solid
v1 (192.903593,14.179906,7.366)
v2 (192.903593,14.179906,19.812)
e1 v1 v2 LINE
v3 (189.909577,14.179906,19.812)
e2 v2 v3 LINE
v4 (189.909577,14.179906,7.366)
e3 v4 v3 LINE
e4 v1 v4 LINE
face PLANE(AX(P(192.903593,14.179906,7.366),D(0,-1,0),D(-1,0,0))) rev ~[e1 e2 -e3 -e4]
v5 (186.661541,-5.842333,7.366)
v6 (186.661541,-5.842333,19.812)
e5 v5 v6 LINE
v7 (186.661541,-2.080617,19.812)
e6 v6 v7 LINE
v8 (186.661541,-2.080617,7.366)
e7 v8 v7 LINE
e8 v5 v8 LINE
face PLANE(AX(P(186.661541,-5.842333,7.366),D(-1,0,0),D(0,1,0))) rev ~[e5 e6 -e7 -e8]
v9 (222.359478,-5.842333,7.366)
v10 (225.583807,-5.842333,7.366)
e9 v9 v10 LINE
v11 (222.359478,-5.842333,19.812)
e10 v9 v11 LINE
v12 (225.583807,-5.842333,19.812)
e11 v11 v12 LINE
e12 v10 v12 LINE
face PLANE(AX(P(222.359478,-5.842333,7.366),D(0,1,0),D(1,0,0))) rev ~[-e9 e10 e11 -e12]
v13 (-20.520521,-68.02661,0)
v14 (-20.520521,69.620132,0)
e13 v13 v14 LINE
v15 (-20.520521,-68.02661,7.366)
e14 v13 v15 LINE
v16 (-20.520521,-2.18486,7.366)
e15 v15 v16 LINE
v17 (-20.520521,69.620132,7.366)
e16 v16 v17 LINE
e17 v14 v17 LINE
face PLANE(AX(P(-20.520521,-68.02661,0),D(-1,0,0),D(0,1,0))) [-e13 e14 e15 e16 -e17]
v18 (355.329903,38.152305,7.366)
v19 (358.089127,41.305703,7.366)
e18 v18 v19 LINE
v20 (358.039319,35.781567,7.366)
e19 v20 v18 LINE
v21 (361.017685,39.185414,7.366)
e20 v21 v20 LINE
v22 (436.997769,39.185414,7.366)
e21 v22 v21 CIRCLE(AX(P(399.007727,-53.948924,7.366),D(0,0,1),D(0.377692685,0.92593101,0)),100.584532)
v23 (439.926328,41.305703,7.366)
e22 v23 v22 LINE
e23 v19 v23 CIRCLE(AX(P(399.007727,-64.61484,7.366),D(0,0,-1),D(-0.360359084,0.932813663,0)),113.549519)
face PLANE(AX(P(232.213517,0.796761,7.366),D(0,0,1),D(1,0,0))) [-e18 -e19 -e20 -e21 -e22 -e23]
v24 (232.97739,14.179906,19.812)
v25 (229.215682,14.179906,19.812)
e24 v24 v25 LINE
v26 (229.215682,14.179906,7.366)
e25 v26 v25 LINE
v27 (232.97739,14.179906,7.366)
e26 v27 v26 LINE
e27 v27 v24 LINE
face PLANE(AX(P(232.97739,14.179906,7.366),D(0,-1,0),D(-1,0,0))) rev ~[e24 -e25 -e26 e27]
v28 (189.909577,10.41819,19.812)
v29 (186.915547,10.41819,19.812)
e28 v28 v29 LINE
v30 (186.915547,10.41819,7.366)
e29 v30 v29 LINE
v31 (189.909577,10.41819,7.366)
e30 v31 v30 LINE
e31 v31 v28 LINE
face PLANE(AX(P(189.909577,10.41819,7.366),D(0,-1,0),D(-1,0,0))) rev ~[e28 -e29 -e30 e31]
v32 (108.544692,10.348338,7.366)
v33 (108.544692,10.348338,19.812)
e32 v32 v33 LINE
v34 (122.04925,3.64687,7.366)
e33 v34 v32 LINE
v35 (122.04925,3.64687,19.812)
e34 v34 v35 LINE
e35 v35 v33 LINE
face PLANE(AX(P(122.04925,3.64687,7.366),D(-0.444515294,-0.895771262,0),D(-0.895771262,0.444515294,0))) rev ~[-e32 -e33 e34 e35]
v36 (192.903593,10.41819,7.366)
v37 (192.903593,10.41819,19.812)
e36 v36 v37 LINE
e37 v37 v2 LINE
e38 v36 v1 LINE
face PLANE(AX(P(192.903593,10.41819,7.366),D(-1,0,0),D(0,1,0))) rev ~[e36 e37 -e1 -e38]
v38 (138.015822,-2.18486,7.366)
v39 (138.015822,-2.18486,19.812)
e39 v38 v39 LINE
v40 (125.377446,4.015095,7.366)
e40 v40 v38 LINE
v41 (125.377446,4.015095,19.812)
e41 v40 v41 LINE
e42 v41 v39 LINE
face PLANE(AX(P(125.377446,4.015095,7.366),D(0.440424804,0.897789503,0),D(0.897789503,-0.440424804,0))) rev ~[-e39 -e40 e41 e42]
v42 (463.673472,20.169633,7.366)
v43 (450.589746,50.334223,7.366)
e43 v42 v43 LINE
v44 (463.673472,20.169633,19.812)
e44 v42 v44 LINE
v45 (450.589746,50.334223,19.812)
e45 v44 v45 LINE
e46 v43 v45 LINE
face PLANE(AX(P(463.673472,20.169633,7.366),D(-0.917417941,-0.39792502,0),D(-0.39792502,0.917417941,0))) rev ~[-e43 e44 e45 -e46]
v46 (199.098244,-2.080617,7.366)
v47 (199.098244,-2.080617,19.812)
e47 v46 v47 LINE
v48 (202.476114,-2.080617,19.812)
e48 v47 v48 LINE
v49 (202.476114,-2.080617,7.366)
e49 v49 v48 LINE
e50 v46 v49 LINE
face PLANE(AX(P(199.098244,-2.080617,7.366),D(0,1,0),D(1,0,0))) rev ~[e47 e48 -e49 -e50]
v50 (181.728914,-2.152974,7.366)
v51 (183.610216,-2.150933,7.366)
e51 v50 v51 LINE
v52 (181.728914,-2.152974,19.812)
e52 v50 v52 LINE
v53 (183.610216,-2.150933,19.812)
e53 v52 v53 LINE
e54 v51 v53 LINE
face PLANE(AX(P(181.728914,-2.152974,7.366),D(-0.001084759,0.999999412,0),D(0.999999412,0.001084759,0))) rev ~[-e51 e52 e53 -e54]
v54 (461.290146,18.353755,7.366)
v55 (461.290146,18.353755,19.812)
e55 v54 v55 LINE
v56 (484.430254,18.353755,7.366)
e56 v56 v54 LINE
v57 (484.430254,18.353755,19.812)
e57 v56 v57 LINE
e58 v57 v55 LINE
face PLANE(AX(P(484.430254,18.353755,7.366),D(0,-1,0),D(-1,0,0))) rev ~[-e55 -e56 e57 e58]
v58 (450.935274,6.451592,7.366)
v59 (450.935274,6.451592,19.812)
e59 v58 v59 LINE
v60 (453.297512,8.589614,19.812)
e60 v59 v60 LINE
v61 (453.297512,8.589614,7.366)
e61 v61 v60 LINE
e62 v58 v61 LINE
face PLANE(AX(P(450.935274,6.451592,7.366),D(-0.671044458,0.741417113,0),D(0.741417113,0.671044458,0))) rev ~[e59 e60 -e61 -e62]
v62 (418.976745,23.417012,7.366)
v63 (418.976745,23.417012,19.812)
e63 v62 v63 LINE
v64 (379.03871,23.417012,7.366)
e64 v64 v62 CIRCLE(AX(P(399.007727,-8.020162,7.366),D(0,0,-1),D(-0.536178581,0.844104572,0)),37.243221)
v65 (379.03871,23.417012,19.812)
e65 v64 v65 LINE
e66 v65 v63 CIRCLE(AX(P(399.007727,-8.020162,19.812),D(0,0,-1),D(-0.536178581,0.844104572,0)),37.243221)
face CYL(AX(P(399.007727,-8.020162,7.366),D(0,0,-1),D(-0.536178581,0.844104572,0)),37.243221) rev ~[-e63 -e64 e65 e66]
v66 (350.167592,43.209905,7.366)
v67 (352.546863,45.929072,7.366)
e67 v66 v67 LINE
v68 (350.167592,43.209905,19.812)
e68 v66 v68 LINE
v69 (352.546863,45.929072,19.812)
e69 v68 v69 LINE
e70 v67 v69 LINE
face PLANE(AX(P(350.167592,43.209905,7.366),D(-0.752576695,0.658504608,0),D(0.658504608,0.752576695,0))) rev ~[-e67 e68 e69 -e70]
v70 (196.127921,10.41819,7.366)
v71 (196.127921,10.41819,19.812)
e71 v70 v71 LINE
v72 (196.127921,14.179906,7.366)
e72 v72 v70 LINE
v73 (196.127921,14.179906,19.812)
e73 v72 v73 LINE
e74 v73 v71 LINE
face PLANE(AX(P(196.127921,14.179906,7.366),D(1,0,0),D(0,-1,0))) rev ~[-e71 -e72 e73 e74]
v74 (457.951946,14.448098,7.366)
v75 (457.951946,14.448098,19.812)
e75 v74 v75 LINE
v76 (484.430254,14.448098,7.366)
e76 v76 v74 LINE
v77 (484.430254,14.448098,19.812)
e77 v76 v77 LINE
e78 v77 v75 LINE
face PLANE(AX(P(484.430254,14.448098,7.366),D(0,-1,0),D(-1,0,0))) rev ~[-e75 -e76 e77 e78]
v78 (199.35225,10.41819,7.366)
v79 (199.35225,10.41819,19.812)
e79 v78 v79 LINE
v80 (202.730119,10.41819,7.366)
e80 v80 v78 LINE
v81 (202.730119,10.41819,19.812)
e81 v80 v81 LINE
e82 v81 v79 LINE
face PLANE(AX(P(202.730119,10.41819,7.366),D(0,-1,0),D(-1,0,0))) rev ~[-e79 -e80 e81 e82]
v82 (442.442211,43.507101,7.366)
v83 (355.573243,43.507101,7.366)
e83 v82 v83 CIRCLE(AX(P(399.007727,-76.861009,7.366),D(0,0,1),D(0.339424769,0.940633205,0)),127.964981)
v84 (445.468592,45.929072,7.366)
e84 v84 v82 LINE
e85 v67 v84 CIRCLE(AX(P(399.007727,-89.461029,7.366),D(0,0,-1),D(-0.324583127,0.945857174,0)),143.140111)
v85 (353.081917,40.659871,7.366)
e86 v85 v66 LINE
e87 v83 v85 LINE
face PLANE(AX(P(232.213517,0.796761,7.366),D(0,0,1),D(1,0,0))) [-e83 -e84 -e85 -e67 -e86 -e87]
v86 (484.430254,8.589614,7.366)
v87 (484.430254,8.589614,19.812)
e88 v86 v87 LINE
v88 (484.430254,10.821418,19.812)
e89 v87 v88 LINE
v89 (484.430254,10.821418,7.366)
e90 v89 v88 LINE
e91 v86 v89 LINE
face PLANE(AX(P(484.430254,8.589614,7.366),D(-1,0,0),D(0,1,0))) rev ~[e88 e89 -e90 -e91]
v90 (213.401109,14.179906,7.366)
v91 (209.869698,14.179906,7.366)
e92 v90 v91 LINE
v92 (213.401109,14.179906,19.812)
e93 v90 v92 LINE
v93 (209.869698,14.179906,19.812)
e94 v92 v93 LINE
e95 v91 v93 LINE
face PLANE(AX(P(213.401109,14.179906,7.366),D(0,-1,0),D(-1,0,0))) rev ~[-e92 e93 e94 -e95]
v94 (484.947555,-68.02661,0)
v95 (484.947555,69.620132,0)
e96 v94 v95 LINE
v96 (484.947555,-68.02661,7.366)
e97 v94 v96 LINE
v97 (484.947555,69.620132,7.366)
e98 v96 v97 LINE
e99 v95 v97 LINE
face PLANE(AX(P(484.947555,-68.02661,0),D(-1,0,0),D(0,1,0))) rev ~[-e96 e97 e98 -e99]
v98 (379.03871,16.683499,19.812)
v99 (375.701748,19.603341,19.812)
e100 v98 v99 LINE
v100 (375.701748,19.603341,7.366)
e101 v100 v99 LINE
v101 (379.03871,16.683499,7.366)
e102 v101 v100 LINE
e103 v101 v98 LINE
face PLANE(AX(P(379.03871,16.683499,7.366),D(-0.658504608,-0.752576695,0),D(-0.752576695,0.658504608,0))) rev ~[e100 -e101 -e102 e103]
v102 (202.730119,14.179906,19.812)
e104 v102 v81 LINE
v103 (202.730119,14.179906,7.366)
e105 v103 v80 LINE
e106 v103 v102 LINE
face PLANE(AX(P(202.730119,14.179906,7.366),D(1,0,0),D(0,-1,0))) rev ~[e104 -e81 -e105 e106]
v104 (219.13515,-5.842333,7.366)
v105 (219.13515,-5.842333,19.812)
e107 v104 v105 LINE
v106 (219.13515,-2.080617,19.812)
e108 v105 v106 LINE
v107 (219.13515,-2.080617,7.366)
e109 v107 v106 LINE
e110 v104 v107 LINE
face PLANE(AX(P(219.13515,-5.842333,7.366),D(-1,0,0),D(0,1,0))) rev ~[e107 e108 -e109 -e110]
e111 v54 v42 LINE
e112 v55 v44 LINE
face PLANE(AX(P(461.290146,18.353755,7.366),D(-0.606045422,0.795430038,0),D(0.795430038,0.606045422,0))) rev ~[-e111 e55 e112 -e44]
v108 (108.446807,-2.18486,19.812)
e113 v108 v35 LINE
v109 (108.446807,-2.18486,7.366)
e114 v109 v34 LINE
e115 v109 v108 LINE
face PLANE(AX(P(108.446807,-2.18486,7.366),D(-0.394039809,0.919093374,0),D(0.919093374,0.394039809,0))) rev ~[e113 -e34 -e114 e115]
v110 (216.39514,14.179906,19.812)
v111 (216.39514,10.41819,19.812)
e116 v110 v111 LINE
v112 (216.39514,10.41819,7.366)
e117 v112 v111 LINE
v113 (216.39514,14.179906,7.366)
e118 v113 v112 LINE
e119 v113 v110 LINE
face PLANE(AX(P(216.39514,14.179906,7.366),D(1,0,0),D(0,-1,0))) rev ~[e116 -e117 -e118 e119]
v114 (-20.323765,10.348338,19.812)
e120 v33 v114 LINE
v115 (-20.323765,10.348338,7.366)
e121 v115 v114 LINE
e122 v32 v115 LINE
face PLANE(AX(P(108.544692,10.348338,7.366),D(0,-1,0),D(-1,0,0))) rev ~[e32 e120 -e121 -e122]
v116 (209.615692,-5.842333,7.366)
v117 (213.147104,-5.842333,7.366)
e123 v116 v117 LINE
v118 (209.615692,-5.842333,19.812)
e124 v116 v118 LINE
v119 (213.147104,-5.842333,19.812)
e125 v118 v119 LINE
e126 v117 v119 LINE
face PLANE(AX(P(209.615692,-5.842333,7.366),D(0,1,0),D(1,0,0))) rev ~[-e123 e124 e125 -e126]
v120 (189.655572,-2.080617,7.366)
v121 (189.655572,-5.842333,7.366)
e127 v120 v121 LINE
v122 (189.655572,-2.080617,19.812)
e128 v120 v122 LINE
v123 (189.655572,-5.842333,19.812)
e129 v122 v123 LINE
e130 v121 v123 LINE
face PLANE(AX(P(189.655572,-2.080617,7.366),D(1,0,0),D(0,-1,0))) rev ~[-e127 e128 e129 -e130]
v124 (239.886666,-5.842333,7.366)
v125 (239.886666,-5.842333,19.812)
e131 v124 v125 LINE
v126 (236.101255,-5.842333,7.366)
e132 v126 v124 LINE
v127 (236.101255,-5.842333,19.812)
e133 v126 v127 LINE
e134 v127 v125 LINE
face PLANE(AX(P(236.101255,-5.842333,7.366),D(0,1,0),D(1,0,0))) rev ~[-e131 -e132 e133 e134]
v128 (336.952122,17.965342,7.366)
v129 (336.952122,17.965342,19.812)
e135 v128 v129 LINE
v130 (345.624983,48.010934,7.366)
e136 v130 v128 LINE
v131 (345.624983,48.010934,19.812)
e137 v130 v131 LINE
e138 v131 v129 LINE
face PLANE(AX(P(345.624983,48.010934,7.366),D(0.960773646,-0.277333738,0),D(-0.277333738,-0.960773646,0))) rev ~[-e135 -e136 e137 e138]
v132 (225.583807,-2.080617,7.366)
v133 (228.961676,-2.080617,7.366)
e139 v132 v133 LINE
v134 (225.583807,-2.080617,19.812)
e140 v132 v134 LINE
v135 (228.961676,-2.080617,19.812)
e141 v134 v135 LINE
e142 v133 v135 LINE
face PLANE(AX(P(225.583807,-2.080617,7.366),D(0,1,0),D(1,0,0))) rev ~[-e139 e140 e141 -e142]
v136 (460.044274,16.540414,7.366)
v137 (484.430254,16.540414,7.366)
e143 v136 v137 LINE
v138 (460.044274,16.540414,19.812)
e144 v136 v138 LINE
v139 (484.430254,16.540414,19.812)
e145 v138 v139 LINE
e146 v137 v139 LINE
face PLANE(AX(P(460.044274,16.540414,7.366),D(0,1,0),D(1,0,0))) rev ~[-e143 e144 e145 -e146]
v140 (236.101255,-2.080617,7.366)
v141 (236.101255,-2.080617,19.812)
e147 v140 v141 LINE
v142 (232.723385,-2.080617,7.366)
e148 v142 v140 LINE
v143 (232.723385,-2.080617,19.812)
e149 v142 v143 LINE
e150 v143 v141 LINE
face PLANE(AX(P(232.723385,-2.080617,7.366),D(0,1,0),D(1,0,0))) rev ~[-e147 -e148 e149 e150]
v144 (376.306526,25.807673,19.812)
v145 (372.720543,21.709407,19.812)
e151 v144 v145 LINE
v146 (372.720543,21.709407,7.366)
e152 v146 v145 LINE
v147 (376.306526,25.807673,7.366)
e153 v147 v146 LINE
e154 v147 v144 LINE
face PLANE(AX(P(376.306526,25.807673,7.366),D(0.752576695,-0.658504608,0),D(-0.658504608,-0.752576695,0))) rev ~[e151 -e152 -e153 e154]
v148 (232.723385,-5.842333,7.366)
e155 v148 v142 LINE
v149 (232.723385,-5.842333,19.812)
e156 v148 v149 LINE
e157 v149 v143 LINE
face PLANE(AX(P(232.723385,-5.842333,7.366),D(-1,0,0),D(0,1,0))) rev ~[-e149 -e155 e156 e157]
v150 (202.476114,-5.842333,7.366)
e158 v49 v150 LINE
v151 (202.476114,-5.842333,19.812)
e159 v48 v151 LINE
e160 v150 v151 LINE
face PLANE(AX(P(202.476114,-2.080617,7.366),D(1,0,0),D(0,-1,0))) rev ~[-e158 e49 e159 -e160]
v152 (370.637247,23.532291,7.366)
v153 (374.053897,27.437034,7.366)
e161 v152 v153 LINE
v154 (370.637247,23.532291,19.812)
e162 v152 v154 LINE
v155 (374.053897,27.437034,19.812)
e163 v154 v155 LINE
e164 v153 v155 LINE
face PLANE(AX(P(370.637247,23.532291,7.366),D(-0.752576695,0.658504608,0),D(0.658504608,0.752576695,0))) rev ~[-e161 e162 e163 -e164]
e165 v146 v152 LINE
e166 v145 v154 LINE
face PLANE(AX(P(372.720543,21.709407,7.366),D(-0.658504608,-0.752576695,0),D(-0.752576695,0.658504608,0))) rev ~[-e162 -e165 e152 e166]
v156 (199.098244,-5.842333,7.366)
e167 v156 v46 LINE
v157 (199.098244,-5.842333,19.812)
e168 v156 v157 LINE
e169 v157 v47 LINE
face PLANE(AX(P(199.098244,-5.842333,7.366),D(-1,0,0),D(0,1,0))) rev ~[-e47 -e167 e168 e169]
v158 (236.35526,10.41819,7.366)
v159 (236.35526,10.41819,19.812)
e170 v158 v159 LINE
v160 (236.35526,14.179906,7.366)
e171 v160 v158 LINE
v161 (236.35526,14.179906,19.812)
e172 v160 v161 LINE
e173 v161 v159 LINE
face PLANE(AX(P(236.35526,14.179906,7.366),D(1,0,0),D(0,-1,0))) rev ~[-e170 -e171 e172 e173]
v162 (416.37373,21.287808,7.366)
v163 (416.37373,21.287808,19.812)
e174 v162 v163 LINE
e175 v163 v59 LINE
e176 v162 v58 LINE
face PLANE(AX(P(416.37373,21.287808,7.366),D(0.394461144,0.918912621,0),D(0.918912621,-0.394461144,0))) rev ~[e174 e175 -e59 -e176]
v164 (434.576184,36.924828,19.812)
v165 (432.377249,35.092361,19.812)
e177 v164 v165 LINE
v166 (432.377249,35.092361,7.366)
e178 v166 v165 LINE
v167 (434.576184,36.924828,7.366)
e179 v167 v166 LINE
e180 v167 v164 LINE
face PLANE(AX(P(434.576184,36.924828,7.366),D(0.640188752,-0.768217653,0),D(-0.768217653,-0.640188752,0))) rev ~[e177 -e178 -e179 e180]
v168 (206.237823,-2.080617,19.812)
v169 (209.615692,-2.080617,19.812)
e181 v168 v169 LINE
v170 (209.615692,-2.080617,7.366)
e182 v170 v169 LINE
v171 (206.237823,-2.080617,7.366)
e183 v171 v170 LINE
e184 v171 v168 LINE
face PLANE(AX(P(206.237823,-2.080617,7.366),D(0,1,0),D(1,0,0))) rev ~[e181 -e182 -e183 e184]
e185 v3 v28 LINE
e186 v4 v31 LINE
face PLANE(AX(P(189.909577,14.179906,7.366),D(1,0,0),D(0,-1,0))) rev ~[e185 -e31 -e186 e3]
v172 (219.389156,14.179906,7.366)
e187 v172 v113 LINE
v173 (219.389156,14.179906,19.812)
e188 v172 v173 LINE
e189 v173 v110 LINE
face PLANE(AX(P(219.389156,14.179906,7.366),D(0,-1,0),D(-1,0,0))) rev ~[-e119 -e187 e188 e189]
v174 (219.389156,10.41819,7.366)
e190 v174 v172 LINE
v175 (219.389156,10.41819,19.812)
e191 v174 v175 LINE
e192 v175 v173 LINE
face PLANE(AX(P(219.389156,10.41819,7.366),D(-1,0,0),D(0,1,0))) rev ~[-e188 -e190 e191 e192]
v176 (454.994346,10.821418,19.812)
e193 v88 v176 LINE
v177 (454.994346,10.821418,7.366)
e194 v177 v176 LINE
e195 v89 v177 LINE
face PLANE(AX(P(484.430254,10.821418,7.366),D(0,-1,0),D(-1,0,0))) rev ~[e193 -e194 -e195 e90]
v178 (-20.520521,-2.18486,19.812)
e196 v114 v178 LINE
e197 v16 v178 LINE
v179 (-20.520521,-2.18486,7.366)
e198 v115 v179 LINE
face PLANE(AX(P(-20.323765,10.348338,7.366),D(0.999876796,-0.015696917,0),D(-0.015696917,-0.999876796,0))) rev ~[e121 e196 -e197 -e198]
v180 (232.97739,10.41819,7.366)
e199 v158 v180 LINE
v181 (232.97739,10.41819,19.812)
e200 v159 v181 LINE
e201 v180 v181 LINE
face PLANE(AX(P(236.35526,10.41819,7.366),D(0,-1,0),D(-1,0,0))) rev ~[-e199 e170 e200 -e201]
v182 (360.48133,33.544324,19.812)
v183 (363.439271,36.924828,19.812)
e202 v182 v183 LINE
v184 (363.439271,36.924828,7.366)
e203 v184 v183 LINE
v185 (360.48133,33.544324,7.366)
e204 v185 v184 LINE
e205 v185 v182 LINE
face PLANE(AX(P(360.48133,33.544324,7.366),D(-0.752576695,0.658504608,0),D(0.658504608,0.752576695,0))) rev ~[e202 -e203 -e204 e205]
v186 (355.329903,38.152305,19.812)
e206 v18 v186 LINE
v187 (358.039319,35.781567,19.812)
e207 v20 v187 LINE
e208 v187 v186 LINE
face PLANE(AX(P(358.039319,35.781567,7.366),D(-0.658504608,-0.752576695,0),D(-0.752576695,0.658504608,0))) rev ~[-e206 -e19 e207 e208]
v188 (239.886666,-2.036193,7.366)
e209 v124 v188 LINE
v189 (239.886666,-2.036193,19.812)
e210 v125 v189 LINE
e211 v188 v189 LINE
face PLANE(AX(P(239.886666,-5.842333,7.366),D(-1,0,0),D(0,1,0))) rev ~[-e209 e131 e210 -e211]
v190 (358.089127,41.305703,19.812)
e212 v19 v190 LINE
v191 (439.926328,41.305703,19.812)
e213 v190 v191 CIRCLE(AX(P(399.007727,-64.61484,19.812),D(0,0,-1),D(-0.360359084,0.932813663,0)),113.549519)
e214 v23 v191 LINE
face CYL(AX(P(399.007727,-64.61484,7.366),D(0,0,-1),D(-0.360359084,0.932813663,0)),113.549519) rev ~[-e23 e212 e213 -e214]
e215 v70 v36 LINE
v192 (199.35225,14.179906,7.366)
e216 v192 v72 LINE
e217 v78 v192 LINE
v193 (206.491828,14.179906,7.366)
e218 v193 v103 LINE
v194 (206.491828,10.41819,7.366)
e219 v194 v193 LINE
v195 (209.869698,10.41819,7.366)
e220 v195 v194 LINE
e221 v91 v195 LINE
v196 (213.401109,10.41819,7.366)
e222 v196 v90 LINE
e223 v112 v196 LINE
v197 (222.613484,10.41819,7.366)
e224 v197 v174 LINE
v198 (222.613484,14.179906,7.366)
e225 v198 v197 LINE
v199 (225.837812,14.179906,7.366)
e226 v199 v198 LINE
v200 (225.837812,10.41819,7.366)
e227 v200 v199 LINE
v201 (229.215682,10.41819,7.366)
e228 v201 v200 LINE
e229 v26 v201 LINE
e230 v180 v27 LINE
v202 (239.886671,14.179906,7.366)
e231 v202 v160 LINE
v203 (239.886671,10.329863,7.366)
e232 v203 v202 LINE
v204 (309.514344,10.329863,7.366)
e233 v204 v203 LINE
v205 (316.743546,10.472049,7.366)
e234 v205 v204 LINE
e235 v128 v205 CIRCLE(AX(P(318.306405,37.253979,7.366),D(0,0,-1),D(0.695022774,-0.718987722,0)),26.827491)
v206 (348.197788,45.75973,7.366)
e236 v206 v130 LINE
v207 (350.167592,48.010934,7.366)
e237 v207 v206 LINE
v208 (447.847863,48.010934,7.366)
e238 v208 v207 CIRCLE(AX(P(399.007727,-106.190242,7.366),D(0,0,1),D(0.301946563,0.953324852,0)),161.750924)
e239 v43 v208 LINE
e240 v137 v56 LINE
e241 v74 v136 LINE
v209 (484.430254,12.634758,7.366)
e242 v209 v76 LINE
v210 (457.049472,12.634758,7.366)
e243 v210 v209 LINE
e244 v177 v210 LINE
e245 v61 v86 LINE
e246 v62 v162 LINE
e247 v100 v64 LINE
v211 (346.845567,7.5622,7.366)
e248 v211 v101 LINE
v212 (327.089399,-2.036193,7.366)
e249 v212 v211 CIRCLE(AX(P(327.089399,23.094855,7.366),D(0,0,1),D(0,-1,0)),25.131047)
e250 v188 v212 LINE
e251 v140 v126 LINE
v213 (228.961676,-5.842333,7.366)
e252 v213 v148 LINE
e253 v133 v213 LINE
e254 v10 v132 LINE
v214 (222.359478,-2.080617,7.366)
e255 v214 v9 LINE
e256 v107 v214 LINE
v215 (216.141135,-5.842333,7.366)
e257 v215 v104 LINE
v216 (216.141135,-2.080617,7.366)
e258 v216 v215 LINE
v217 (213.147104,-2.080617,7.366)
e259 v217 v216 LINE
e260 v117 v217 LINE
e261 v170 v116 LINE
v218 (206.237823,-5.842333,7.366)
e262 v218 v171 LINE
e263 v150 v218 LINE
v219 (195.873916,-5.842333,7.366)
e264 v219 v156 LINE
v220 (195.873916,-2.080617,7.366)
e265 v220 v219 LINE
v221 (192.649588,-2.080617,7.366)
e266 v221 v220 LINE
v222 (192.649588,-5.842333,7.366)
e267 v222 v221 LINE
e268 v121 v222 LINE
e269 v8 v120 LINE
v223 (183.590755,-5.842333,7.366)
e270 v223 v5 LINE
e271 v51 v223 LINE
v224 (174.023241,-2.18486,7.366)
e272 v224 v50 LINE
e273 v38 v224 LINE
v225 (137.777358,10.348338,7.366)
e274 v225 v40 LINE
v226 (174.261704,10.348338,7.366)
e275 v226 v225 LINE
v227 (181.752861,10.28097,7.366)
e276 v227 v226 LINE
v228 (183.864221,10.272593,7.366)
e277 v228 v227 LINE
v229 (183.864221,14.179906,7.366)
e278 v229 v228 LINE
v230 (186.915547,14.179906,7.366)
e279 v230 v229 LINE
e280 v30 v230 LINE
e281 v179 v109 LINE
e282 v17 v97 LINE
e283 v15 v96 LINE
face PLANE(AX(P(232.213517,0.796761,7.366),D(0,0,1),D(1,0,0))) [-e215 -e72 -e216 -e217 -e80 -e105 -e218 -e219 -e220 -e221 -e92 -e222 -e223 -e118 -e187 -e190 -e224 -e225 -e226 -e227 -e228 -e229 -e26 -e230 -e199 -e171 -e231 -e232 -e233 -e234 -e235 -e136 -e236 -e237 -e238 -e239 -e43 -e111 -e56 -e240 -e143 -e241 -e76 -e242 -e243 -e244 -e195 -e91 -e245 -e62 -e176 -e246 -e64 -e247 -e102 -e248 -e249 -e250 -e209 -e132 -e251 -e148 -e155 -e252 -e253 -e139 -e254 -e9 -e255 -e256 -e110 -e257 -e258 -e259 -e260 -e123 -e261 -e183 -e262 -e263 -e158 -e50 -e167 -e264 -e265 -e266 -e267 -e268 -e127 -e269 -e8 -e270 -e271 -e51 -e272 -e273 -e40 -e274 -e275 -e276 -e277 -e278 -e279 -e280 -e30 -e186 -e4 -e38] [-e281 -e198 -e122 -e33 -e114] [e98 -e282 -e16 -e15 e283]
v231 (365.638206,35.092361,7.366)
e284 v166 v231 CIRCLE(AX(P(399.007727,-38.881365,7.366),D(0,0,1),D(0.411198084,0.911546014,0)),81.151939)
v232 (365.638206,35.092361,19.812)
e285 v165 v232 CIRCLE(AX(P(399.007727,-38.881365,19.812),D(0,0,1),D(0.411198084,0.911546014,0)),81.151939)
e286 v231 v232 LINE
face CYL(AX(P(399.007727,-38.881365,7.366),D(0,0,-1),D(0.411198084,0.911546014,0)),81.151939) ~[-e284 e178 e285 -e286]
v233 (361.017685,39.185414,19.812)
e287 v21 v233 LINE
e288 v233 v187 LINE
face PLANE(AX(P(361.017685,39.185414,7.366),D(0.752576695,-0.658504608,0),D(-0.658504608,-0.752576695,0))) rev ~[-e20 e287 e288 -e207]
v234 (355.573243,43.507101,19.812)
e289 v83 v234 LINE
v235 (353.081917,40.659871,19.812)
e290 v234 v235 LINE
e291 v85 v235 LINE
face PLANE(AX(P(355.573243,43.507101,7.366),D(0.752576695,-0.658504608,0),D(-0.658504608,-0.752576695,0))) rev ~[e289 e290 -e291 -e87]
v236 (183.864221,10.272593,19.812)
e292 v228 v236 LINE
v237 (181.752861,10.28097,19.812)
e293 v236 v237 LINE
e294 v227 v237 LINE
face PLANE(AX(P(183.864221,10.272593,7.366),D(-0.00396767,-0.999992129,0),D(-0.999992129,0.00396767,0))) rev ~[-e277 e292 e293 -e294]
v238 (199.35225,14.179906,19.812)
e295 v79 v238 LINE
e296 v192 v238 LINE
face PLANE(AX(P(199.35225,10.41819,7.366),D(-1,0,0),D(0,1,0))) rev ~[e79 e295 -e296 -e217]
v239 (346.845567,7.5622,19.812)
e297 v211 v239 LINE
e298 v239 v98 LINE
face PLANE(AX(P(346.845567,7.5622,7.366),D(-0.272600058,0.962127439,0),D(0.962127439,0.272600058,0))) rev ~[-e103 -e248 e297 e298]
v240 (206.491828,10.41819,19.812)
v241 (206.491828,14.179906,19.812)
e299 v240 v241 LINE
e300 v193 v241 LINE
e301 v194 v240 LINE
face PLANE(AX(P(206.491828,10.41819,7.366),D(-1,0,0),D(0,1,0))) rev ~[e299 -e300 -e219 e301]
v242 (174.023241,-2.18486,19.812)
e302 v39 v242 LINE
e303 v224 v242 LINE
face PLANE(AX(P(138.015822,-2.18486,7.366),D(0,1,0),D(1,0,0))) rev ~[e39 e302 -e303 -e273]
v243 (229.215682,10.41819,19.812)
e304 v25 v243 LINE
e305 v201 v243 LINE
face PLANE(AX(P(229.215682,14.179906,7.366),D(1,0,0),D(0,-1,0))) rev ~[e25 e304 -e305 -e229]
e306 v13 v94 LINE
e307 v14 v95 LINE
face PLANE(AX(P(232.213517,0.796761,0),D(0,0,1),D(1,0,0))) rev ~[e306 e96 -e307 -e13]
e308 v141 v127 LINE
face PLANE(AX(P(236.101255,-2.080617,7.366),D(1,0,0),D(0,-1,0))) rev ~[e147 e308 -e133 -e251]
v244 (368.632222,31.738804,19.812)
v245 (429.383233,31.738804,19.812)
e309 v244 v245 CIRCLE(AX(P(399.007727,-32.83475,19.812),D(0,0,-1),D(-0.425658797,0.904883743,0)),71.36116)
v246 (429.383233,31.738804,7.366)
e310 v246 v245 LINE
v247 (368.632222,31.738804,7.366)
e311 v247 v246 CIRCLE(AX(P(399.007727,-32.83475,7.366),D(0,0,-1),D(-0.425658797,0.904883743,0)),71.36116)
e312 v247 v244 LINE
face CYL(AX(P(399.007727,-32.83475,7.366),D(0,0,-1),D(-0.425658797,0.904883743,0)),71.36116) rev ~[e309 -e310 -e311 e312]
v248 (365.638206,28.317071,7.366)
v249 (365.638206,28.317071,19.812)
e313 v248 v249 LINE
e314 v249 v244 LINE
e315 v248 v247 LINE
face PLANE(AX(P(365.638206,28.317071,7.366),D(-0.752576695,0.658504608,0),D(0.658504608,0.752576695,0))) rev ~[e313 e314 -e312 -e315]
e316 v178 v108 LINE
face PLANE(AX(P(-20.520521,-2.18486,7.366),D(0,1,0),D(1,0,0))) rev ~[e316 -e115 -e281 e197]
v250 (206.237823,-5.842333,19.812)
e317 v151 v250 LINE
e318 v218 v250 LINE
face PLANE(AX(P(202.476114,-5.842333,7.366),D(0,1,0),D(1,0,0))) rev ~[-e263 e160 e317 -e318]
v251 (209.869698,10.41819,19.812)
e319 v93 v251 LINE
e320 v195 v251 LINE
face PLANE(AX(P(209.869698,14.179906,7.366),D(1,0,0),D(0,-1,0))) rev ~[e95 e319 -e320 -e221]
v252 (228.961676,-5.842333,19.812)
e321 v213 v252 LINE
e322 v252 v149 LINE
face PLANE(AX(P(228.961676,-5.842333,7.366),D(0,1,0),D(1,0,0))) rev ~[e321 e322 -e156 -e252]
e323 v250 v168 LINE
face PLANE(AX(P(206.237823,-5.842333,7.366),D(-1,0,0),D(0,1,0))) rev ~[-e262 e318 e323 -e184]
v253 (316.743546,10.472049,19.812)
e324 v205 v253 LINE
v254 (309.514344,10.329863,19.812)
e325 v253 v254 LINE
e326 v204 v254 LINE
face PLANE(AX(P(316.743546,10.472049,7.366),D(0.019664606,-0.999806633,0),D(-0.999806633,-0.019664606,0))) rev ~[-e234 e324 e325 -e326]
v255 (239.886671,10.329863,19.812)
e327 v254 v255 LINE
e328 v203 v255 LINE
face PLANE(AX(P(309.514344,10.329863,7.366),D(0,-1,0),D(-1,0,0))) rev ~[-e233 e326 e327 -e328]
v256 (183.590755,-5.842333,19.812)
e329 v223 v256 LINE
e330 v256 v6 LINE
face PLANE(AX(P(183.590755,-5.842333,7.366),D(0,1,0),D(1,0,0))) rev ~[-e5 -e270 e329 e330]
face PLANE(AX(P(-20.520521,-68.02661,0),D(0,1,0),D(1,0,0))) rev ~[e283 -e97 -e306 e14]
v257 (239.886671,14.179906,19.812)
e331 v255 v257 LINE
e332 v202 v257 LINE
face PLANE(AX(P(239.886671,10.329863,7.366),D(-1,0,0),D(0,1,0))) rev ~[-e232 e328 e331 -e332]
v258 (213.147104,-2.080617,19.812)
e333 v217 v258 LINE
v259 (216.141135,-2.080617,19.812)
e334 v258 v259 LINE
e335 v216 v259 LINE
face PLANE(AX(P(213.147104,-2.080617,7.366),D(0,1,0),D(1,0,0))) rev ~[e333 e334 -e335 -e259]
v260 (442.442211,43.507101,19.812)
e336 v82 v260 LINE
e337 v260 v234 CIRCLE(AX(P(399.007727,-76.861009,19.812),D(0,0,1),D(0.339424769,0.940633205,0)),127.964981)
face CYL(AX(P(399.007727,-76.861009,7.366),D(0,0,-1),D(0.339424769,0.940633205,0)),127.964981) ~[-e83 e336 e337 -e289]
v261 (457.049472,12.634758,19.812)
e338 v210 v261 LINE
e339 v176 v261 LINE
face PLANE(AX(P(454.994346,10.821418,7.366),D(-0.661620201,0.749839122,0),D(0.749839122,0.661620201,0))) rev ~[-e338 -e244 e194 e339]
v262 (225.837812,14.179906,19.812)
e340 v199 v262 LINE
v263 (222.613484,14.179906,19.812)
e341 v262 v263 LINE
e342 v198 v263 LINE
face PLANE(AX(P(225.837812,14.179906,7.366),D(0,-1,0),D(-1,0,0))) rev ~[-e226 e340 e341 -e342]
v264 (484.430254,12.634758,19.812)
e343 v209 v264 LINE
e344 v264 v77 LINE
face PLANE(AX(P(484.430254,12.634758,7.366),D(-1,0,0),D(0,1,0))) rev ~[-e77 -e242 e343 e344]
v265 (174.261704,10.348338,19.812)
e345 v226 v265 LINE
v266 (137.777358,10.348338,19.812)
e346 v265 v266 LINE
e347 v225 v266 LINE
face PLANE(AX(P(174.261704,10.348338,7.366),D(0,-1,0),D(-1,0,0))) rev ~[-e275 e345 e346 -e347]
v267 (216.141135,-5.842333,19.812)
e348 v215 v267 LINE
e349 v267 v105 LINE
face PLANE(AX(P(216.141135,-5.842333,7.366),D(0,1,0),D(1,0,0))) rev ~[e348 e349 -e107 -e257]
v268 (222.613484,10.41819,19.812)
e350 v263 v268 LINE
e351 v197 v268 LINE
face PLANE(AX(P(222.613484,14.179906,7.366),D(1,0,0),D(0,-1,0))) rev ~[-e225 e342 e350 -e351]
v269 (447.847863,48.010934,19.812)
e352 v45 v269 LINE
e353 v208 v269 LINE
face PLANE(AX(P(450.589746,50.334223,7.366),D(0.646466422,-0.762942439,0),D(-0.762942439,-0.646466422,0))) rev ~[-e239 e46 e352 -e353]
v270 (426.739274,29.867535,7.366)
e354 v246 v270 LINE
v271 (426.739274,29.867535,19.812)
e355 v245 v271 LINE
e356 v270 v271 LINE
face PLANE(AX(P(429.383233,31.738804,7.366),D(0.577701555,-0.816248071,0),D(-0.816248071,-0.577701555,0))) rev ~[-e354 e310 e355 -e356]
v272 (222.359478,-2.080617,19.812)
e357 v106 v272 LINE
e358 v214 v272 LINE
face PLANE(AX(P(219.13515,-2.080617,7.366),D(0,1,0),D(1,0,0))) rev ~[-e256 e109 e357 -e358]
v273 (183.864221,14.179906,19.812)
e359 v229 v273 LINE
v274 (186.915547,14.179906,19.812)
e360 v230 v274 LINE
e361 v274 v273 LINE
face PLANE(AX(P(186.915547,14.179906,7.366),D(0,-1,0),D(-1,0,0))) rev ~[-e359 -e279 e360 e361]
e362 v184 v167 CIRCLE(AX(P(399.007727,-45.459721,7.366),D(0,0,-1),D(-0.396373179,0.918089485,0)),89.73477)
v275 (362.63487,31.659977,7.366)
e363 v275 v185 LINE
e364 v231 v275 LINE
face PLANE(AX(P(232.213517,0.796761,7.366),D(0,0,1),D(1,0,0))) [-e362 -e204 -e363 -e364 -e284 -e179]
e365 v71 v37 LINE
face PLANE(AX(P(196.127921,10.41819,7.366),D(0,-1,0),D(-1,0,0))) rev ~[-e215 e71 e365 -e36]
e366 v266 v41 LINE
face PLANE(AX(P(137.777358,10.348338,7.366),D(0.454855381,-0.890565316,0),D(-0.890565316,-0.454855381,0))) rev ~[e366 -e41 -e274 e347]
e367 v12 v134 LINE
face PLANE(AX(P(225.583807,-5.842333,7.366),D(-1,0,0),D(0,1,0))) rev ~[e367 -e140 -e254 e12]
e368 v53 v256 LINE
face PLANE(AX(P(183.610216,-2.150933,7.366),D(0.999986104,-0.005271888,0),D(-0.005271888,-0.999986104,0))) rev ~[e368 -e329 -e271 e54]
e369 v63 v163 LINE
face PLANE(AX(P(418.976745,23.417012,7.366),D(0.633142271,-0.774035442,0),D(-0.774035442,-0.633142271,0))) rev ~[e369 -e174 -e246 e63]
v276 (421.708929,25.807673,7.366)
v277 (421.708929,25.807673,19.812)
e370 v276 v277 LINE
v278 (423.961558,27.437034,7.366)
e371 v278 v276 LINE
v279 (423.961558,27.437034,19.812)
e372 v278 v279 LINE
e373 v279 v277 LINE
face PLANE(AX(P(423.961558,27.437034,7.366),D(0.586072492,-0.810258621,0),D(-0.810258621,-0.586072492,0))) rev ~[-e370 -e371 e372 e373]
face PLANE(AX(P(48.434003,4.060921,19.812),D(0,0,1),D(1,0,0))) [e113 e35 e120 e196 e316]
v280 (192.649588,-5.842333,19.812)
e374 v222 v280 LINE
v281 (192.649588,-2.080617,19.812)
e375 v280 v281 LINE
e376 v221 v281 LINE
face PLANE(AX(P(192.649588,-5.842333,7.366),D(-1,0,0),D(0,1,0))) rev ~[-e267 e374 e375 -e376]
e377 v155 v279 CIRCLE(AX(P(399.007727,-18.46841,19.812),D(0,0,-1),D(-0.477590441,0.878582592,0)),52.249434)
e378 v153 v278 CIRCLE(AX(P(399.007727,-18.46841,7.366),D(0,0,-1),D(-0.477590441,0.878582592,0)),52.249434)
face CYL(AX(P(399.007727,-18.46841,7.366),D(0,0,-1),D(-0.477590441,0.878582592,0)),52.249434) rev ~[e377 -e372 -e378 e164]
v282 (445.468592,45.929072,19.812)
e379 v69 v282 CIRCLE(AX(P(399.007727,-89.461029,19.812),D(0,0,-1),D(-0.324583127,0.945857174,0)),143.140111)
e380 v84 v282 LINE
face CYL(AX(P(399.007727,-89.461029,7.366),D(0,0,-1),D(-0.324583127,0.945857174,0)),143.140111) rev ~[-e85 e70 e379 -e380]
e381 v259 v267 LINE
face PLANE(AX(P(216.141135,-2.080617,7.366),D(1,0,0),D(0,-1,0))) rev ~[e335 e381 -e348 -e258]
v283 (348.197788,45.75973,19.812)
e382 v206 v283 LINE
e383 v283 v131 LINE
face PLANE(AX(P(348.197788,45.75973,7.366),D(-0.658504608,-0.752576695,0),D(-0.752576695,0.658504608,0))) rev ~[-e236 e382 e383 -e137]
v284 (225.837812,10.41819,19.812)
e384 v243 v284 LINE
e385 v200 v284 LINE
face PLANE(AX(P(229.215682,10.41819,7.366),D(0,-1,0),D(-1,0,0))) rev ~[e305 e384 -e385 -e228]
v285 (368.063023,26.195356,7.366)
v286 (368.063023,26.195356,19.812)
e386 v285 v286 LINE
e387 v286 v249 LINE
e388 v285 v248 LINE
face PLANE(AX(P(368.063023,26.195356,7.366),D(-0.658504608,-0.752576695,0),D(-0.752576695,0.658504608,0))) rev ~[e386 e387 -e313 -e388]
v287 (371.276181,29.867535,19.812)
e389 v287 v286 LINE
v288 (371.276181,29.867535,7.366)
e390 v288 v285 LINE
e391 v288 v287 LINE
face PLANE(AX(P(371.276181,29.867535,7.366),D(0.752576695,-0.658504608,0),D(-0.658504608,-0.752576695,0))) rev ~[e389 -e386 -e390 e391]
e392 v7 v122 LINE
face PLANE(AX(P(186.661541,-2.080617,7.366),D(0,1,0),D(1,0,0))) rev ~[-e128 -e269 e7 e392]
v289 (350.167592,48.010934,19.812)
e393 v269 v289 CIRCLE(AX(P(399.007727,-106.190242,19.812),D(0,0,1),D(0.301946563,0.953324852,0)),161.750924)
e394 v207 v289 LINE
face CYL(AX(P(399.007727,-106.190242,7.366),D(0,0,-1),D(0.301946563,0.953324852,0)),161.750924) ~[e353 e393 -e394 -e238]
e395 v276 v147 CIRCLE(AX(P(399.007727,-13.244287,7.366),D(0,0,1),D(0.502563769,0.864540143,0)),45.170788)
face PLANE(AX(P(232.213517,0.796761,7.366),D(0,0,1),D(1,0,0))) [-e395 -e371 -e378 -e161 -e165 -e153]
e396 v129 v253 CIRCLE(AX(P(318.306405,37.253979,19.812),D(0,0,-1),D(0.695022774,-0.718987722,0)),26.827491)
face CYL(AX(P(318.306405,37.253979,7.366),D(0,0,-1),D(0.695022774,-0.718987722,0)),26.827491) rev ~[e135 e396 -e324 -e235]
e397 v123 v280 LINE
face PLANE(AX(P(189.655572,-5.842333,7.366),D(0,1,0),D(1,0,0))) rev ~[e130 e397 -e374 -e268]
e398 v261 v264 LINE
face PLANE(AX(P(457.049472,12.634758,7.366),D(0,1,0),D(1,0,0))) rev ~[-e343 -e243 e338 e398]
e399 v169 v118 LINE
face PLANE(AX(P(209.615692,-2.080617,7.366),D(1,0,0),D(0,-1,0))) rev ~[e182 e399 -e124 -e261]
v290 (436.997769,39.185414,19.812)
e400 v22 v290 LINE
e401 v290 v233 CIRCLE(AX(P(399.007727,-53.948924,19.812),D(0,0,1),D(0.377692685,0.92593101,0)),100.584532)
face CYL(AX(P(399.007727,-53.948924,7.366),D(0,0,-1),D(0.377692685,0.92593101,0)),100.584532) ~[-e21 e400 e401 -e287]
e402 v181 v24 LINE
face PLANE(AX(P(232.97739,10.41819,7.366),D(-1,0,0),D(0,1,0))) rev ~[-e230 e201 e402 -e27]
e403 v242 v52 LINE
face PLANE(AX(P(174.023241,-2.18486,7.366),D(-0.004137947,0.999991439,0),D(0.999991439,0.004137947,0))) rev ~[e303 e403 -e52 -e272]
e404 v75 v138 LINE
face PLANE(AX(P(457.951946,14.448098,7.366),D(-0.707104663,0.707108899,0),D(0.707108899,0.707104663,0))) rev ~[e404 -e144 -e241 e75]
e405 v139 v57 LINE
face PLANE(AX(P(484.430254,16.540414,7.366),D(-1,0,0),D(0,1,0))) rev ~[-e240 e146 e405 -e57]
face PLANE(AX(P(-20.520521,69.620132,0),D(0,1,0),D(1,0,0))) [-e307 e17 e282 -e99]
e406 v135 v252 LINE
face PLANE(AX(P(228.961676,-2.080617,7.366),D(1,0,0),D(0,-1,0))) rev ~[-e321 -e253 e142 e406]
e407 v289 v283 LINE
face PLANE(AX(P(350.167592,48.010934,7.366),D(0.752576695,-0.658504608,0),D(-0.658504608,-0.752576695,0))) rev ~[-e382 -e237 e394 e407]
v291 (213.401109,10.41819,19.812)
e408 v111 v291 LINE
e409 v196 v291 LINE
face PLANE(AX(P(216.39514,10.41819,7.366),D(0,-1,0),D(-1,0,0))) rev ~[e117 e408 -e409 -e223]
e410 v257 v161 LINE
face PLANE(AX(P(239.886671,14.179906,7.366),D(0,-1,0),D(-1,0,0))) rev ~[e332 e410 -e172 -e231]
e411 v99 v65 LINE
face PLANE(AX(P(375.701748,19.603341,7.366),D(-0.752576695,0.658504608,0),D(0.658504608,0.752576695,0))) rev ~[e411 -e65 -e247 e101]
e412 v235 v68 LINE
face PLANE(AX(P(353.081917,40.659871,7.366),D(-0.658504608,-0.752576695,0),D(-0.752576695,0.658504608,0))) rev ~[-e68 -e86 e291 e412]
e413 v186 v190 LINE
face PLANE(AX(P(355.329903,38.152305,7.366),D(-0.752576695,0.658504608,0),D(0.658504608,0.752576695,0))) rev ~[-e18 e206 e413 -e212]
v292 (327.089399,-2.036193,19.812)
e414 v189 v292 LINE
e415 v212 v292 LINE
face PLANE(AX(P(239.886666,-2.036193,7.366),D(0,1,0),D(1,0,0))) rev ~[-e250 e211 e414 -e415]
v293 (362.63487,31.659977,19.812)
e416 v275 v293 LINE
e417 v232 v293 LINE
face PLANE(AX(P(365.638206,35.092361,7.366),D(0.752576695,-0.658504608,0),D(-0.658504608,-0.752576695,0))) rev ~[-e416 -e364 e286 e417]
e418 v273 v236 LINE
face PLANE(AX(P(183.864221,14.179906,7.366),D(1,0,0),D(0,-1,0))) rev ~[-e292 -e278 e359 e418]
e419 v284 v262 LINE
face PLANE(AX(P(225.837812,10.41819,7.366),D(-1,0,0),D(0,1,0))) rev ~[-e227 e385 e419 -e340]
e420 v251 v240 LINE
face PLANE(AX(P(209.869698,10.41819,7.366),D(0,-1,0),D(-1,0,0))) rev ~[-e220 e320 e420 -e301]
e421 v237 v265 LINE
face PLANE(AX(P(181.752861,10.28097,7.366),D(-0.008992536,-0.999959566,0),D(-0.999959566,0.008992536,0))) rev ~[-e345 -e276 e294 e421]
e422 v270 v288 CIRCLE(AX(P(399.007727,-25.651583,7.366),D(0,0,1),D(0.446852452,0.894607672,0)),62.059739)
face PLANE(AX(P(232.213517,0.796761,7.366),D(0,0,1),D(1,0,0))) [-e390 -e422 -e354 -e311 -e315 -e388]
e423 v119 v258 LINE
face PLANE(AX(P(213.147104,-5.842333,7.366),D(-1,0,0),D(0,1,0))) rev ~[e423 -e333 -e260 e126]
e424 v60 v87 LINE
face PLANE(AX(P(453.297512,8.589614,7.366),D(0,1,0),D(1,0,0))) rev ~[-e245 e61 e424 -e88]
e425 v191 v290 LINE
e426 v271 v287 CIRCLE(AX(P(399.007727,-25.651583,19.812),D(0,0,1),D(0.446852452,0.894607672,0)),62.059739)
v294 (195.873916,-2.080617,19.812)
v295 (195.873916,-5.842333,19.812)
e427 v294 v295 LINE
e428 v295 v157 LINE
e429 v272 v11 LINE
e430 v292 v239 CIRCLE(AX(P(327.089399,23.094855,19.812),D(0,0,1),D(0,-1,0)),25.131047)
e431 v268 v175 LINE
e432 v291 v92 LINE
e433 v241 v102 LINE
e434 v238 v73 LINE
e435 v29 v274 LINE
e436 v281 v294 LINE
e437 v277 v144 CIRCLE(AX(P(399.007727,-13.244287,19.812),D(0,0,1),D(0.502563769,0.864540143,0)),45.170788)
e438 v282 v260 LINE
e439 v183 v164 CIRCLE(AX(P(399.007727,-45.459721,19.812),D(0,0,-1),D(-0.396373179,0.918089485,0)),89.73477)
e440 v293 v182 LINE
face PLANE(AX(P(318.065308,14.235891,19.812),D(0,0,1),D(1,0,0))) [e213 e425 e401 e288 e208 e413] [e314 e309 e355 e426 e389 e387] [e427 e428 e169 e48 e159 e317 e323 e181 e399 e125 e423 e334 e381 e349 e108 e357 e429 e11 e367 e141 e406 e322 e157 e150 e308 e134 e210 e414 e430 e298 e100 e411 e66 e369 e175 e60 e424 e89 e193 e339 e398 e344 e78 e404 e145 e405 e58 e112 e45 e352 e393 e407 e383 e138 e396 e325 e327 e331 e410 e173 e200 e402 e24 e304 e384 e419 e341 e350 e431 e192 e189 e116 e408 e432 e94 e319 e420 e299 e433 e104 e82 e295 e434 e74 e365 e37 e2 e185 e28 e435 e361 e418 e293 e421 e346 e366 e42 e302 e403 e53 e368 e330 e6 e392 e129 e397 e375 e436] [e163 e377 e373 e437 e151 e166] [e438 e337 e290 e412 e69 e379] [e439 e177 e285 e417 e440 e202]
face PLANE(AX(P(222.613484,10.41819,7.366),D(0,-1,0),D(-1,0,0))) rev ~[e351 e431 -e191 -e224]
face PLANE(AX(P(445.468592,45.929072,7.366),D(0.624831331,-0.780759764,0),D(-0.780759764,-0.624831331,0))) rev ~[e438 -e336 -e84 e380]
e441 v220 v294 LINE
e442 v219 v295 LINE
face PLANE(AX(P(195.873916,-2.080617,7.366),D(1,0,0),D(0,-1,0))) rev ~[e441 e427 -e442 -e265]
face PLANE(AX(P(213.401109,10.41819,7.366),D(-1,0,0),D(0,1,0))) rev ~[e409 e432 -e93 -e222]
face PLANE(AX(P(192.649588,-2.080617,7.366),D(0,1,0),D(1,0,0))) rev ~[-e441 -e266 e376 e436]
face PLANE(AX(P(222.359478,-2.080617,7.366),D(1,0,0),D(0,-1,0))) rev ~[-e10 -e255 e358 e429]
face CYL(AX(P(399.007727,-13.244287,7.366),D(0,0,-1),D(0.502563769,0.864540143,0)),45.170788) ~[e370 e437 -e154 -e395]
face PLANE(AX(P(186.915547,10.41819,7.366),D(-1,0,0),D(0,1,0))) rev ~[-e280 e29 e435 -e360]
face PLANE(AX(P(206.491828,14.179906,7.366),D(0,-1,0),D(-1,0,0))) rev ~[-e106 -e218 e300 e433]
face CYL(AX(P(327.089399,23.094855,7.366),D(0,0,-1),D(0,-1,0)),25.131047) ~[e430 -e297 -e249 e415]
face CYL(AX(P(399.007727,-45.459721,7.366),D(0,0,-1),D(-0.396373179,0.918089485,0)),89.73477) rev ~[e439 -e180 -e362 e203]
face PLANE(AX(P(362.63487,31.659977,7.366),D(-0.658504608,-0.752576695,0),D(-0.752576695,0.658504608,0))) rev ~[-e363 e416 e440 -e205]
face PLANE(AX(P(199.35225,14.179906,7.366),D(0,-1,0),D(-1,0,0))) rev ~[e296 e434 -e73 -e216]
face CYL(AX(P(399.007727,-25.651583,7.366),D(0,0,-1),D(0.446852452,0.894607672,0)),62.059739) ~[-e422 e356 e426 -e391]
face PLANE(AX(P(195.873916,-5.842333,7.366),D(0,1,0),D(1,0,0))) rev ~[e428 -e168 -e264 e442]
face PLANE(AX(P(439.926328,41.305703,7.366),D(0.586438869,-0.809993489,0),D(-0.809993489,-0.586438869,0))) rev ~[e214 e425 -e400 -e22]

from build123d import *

# Parameters (mm, degrees)
F0_W     = 505.468076095
F0_H     = 137.6467421651
F1_DEPTH = 7.366
F3_DEPTH = 12.446


# Not quite as in the source:
# - a feature names something its author has since deleted; it is built from what else it names


with BuildPart() as f1:
    # F0 (on Top) → F1 (new body)
    with BuildSketch(Plane.XY):
        with Locations((232.2135167196, 0.7967613637)):
            Rectangle(F0_W, F0_H)
    extrude(amount=F1_DEPTH)

    # F2 (on face) → F3 (join)
    with BuildSketch(Plane.XY.offset(7.366)):
        with BuildLine():
            Line((183.8642209768, 14.1799058765), (183.8642209768, 10.2725932375))
            Line((183.8642209768, 10.2725932375), (181.7528605461, 10.280970484))
            Line((181.7528605461, 10.280970484), (174.2617040873, 10.3483377025))
            Line((174.2617040873, 10.3483377025), (137.7773582935, 10.3483377025))
            Line((137.7773582935, 10.3483377025), (125.377446413, 4.0150946006))
            Line((125.377446413, 4.0150946006), (138.0158215761, -2.1848597098))
            Line((138.0158215761, -2.1848597098), (174.0232408047, -2.1848597098))
            Line((174.0232408047, -2.1848597098), (181.7289143801, -2.1529737648))
            Line((181.7289143801, -2.1529737648), (183.6102157831, -2.1509330043))
            Line((183.6102157831, -2.1509330043), (183.5907548666, -5.8423327282))
            Line((183.5907548666, -5.8423327282), (186.6615414619, -5.8423327282))
            Line((186.6615414619, -5.8423327282), (186.6615414619, -2.0806165412))
            Line((186.6615414619, -2.0806165412), (189.655572176, -2.0806165412))
            Line((189.655572176, -2.0806165412), (189.655572176, -5.8423327282))
            Line((189.655572176, -5.8423327282), (192.6495879889, -5.8423327282))
            Line((192.6495879889, -5.8423327282), (192.6495879889, -2.0806165412))
            Line((192.6495879889, -2.0806165412), (195.8739161491, -2.0806165412))
            Line((195.8739161491, -2.0806165412), (195.8739161491, -5.8423327282))
            Line((195.8739161491, -5.8423327282), (199.0982443094, -5.8423327282))
            Line((199.0982443094, -5.8423327282), (199.0982443094, -2.0806165412))
            Line((199.0982443094, -2.0806165412), (202.4761140347, -2.0806165412))
            Line((202.4761140347, -2.0806165412), (202.4761140347, -5.8423327282))
            Line((202.4761140347, -5.8423327282), (206.2378227711, -5.8423327282))
            Line((206.2378227711, -5.8423327282), (206.2378227711, -2.0806165412))
            Line((206.2378227711, -2.0806165412), (209.6156924963, -2.0806165412))
            Line((209.6156924963, -2.0806165412), (209.6156924963, -5.8423327282))
            Line((209.6156924963, -5.8423327282), (213.1471037865, -5.8423327282))
            Line((213.1471037865, -5.8423327282), (213.1471037865, -2.0806165412))
            Line((213.1471037865, -2.0806165412), (216.1411345005, -2.0806165412))
            Line((216.1411345005, -2.0806165412), (216.1411345005, -5.8423327282))
            Line((216.1411345005, -5.8423327282), (219.1351503134, -5.8423327282))
            Line((219.1351503134, -5.8423327282), (219.1351503134, -2.0806165412))
            Line((219.1351503134, -2.0806165412), (222.3594784737, -2.0806165412))
            Line((222.3594784737, -2.0806165412), (222.3594784737, -5.8423327282))
            Line((222.3594784737, -5.8423327282), (225.5838066339, -5.8423327282))
            Line((225.5838066339, -5.8423327282), (225.5838066339, -2.0806165412))
            Line((225.5838066339, -2.0806165412), (228.9616763592, -2.0806165412))
            Line((228.9616763592, -2.0806165412), (228.9616763592, -5.8423327282))
            Line((228.9616763592, -5.8423327282), (232.7233850956, -5.8423327282))
            Line((232.7233850956, -5.8423327282), (232.7233850956, -2.0806165412))
            Line((232.7233850956, -2.0806165412), (236.1012548208, -2.0806165412))
            Line((236.1012548208, -2.0806165412), (236.1012548208, -5.8423327282))
            Line((236.1012548208, -5.8423327282), (239.886666111, -5.8423327282))
            Line((239.886666111, -5.8423327282), (239.886666111, -2.0361929703))
            Line((239.886666111, -2.0361929703), (308.7113499641, -2.0361929703))
            Line((308.7113499641, -2.0361929703), (327.0893990993, -2.0361929703))
            ThreePointArc((327.0893990993, -2.0361929703), (338.0716042416, 0.4904142901), (346.8455672264, 7.5621996075))
            Line((346.8455672264, 7.5621996075), (379.0387098504, 16.6834991227))
            Line((379.0387098504, 16.6834991227), (375.7017479006, 19.6033408288))
            Line((375.7017479006, 19.6033408288), (379.0387098504, 23.4170116286))
            ThreePointArc((379.0387098504, 23.4170116286), (399.0077273508, 29.2230595274), (418.9767448512, 23.4170116286))
            Line((418.9767448512, 23.4170116286), (416.3737297058, 21.2878081948))
            Line((416.3737297058, 21.2878081948), (450.9352743626, 6.4515918493))
            Line((450.9352743626, 6.4515918493), (453.2975118055, 8.5896141827))
            Line((453.2975118055, 8.5896141827), (484.4302535057, 8.5896141827))
            Line((484.4302535057, 8.5896141827), (484.4302535057, 10.8214179054))
            Line((484.4302535057, 10.8214179054), (454.9943455488, 10.8214179054))
            Line((454.9943455488, 10.8214179054), (457.0494721473, 12.6347579062))
            Line((457.0494721473, 12.6347579062), (484.4302535057, 12.6347579062))
            Line((484.4302535057, 12.6347579062), (484.4302535057, 14.448097907))
            Line((484.4302535057, 14.448097907), (457.9519460917, 14.448097907))
            Line((457.9519460917, 14.448097907), (460.04427444, 16.5404137224))
            Line((460.04427444, 16.5404137224), (484.4302535057, 16.5404137224))
            Line((484.4302535057, 16.5404137224), (484.4302535057, 18.3537546545))
            Line((484.4302535057, 18.3537546545), (461.2901464378, 18.3537546545))
            Line((461.2901464378, 18.3537546545), (463.6734724045, 20.1696325094))
            Line((463.6734724045, 20.1696325094), (450.5897462368, 50.3342226148))
            Line((450.5897462368, 50.3342226148), (447.8478631112, 48.0109341443))
            ThreePointArc((447.8478631112, 48.0109341443), (399.0077273508, 55.560682533), (350.1675915904, 48.0109341443))
            Line((350.1675915904, 48.0109341443), (348.1977880001, 45.759730041))
            Line((348.1977880001, 45.759730041), (345.6249833107, 48.0109341443))
            Line((345.6249833107, 48.0109341443), (336.9521223247, 17.9653423708))
            ThreePointArc((336.9521223247, 17.9653423708), (327.6334286446, 12.1000348485), (316.7435458205, 10.4720494957))
            Line((316.7435458205, 10.4720494957), (309.5143437386, 10.3298625909))
            Line((309.5143437386, 10.3298625909), (239.8866713047, 10.3298625909))
            Line((239.8866713047, 10.3298625909), (239.8866713047, 14.1799058765))
            Line((239.8866713047, 14.1799058765), (236.3552600145, 14.1799058765))
            Line((236.3552600145, 14.1799058765), (236.3552600145, 10.4181896895))
            Line((236.3552600145, 10.4181896895), (232.9773902893, 10.4181896895))
            Line((232.9773902893, 10.4181896895), (232.9773902893, 14.1799058765))
            Line((232.9773902893, 14.1799058765), (229.2156815529, 14.1799058765))
            Line((229.2156815529, 14.1799058765), (229.2156815529, 10.4181896895))
            Line((229.2156815529, 10.4181896895), (225.8378118277, 10.4181896895))
            Line((225.8378118277, 10.4181896895), (225.8378118277, 14.1799058765))
            Line((225.8378118277, 14.1799058765), (222.6134836674, 14.1799058765))
            Line((222.6134836674, 14.1799058765), (222.6134836674, 10.4181896895))
            Line((222.6134836674, 10.4181896895), (219.3891555071, 10.4181896895))
            Line((219.3891555071, 10.4181896895), (219.3891555071, 14.1799058765))
            Line((219.3891555071, 14.1799058765), (216.3951396942, 14.1799058765))
            Line((216.3951396942, 14.1799058765), (216.3951396942, 10.4181896895))
            Line((216.3951396942, 10.4181896895), (213.4011089802, 10.4181896895))
            Line((213.4011089802, 10.4181896895), (213.4011089802, 14.1799058765))
            Line((213.4011089802, 14.1799058765), (209.86969769, 14.1799058765))
            Line((209.86969769, 14.1799058765), (209.86969769, 10.4181896895))
            Line((209.86969769, 10.4181896895), (206.4918279648, 10.4181896895))
            Line((206.4918279648, 10.4181896895), (206.4918279648, 14.1799058765))
            Line((206.4918279648, 14.1799058765), (202.7301192284, 14.1799058765))
            Line((202.7301192284, 14.1799058765), (202.7301192284, 10.4181896895))
            Line((202.7301192284, 10.4181896895), (199.3522495031, 10.4181896895))
            Line((199.3522495031, 10.4181896895), (199.3522495031, 14.1799058765))
            Line((199.3522495031, 14.1799058765), (196.1279213428, 14.1799058765))
            Line((196.1279213428, 14.1799058765), (196.1279213428, 10.4181896895))
            Line((196.1279213428, 10.4181896895), (192.9035931826, 10.4181896895))
            Line((192.9035931826, 10.4181896895), (192.9035931826, 14.1799058765))
            Line((192.9035931826, 14.1799058765), (189.9095773697, 14.1799058765))
            Line((189.9095773697, 14.1799058765), (189.9095773697, 10.4181896895))
            Line((189.9095773697, 10.4181896895), (186.9155466557, 10.4181896895))
            Line((186.9155466557, 10.4181896895), (186.9155466557, 14.1799058765))
            Line((186.9155466557, 14.1799058765), (183.8642209768, 14.1799058765))
        make_face()
        with BuildLine():
            Line((370.6372472565, 23.5322912479), (374.053896924, 27.4370337251))
            ThreePointArc((374.053896924, 27.4370337251), (399.0077273508, 33.7810246324), (423.9615577776, 27.4370337251))
            Line((423.9615577776, 27.4370337251), (421.708929064, 25.8076728149))
            ThreePointArc((421.708929064, 25.8076728149), (399.0077273508, 31.9265013842), (376.3065256376, 25.8076728149))
            Line((376.3065256376, 25.8076728149), (372.7205432622, 21.7094072429))
            Line((372.7205432622, 21.7094072429), (370.6372472565, 23.5322912479))
        make_face(mode=Mode.SUBTRACT)
        with BuildLine():
            Line((365.6382056992, 28.3170708711), (368.6322219076, 31.7388036808))
            ThreePointArc((368.6322219076, 31.7388036808), (399.0077273508, 38.526410097), (429.383232794, 31.7388036808))
            Line((429.383232794, 31.7388036808), (426.7392740049, 29.867535424))
            ThreePointArc((426.7392740049, 29.867535424), (399.0077273508, 36.4081558373), (371.2761806967, 29.867535424))
            Line((371.2761806967, 29.867535424), (368.0630232644, 26.1953555015))
            Line((368.0630232644, 26.1953555015), (365.6382056992, 28.3170708711))
        make_face(mode=Mode.SUBTRACT)
        with BuildLine():
            Line((360.4813304683, 33.5443242144), (363.4392711441, 36.9248278439))
            ThreePointArc((363.4392711441, 36.9248278439), (399.0077273508, 44.2750490819), (434.5761835575, 36.9248278439))
            Line((434.5761835575, 36.9248278439), (432.3772490025, 35.0923612714))
            ThreePointArc((432.3772490025, 35.0923612714), (399.0077273508, 42.2705737087), (365.6382056992, 35.0923612714))
            Line((365.6382056992, 35.0923612714), (362.6348697567, 31.6599773371))
            Line((362.6348697567, 31.6599773371), (360.4813304683, 33.5443242144))
        make_face(mode=Mode.SUBTRACT)
        with BuildLine():
            Line((355.3299033536, 38.152305195), (358.0891265806, 41.3057031687))
            ThreePointArc((358.0891265806, 41.3057031687), (399.0077273508, 48.9346794019), (439.926328121, 41.3057031687))
            Line((439.926328121, 41.3057031687), (436.997769417, 39.1854137116))
            ThreePointArc((436.997769417, 39.1854137116), (399.0077273508, 46.6356083993), (361.0176852847, 39.1854137116))
            Line((361.0176852847, 39.1854137116), (358.0393189878, 35.7815665152))
            Line((358.0393189878, 35.7815665152), (355.3299033536, 38.152305195))
        make_face(mode=Mode.SUBTRACT)
        with BuildLine():
            Line((350.1675915904, 43.2099050709), (352.5468626356, 45.9290719797))
            ThreePointArc((352.5468626356, 45.9290719797), (399.0077273508, 53.6790820799), (445.468592066, 45.9290719797))
            Line((445.468592066, 45.9290719797), (442.4422114296, 43.5071010637))
            ThreePointArc((442.4422114296, 43.5071010637), (399.0077273508, 51.1039718638), (355.573243272, 43.5071010637))
            Line((355.573243272, 43.5071010637), (353.0819166526, 40.6598706415))
            Line((353.0819166526, 40.6598706415), (350.1675915904, 43.2099050709))
        make_face(mode=Mode.SUBTRACT)
        Polygon((108.4468066692, -2.1848597098), (122.0492497087, 3.6468699109), (108.5446923971, 10.3483377025), (-20.3237645328, 10.3483377025), (-20.5205213279, -2.1848597098), align=None)
    extrude(amount=F3_DEPTH)


solid = f1.part
